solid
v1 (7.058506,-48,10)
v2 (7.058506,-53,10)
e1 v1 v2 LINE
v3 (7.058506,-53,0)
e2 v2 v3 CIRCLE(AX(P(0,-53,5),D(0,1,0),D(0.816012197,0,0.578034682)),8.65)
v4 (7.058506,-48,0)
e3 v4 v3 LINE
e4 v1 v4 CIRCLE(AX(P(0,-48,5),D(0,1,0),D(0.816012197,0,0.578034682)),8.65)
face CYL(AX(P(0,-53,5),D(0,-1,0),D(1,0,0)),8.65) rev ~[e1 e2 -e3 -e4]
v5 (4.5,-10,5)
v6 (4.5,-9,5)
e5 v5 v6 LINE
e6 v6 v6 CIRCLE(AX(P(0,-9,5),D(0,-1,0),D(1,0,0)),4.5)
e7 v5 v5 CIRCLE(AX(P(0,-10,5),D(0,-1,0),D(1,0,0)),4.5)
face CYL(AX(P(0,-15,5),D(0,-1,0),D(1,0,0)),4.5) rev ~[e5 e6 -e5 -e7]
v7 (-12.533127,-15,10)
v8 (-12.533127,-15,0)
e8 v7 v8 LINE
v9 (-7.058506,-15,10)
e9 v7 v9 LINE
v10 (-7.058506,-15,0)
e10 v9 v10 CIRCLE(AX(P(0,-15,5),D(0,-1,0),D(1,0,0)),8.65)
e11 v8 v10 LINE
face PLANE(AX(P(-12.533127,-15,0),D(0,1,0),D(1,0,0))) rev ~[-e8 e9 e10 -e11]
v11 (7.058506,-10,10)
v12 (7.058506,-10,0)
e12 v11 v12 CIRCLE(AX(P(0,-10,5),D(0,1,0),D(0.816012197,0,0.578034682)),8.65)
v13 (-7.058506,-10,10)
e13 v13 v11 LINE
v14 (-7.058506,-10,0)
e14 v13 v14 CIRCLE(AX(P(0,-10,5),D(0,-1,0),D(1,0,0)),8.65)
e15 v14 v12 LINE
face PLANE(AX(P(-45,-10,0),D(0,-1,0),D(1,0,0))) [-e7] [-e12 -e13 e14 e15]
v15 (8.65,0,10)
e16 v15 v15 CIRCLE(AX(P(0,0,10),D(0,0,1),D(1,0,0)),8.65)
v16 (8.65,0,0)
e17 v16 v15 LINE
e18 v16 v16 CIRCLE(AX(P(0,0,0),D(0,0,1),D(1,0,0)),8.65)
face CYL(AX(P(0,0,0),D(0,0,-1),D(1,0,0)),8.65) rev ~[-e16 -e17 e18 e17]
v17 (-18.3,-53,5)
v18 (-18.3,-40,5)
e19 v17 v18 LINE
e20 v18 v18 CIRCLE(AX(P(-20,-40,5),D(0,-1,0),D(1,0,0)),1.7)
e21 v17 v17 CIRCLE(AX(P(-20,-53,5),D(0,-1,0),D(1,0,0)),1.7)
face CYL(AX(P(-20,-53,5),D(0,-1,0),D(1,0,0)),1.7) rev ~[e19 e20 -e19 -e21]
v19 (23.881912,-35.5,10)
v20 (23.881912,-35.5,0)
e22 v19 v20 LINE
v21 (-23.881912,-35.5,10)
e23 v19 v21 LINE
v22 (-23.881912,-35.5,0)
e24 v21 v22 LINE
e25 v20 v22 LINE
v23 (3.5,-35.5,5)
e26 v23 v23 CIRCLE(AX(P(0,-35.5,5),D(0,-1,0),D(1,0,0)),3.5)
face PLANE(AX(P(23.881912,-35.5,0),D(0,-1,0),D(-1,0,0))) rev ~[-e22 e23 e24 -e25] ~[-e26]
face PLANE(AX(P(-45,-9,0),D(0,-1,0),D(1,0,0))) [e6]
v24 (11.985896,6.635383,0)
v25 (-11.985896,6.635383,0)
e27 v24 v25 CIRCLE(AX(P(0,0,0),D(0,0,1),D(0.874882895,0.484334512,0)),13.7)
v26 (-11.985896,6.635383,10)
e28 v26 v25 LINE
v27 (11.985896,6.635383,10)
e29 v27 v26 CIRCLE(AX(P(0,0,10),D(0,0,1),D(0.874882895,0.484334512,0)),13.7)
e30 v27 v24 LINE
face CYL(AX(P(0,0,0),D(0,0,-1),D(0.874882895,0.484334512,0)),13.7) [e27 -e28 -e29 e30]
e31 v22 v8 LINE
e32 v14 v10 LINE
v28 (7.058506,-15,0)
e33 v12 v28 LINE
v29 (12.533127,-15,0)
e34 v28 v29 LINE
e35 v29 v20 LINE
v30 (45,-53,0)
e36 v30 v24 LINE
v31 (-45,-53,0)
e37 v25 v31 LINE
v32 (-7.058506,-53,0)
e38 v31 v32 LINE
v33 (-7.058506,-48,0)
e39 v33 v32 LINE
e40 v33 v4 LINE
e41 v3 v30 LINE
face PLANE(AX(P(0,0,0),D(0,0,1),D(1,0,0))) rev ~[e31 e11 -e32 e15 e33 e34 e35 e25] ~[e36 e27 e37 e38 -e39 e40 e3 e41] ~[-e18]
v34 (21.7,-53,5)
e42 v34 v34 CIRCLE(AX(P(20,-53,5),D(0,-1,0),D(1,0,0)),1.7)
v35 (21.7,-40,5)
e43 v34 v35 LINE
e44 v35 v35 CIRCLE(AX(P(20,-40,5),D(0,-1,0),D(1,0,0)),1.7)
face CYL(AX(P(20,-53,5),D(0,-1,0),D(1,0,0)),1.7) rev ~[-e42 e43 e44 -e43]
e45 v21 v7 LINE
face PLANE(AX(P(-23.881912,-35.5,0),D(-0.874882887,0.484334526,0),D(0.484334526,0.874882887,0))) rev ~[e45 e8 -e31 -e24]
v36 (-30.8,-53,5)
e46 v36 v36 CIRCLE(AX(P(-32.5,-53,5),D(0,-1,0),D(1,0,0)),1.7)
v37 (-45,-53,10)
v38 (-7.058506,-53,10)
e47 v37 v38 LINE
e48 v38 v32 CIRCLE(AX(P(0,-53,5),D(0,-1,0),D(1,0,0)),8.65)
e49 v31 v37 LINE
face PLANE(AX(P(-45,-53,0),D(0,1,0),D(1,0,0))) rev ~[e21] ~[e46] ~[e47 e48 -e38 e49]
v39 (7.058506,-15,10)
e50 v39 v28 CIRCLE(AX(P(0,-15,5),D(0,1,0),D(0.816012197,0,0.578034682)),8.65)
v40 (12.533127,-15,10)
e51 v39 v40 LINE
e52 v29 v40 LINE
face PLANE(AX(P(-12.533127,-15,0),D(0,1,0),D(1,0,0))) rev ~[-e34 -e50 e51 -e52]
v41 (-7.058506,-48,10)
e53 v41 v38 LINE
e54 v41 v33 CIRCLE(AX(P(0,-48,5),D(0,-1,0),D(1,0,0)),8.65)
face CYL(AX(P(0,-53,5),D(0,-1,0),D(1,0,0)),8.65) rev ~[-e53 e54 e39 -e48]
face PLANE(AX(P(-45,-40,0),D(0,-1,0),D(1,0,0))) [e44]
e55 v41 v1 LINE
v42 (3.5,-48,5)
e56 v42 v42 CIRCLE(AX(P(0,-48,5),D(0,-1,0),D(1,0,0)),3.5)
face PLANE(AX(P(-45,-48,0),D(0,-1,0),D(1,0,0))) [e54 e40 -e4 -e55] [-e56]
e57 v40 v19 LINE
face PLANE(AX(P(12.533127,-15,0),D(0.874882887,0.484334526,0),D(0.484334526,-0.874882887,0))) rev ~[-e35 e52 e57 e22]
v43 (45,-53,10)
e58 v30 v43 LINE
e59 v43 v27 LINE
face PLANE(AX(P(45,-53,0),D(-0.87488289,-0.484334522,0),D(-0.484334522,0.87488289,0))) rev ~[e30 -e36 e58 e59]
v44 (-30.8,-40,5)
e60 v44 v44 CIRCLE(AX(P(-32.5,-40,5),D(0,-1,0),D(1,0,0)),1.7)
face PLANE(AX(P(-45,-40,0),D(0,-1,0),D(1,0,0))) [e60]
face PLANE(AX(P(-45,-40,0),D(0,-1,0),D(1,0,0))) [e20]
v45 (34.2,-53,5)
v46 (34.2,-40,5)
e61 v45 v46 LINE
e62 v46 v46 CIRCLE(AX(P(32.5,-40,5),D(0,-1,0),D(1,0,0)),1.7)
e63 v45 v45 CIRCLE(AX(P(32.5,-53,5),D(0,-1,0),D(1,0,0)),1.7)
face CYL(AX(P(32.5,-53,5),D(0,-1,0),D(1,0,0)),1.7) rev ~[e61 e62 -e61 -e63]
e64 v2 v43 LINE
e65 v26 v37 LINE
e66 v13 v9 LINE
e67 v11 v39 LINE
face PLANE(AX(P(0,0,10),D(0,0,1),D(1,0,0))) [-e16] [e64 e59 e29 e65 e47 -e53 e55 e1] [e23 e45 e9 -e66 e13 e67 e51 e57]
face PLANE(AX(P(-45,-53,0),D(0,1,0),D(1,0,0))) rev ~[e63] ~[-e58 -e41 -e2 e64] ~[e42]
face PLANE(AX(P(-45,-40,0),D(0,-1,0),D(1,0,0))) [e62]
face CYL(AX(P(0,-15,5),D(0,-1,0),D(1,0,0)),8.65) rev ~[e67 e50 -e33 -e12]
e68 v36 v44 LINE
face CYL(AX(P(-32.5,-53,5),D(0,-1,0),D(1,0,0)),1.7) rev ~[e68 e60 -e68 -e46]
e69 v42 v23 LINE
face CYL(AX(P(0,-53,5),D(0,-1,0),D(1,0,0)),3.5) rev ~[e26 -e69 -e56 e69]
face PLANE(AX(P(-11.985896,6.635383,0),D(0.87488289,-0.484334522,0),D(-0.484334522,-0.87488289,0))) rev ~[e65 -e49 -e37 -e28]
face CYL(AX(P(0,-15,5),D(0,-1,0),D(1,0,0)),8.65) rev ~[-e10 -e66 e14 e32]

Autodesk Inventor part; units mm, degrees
ref_plane "YZ Plane" through (0, 0, 0) normal (1, 0, 0) x (0, 1, 0)
ref_plane "XZ Plane" through (0, 0, 0) normal (0, 1, 0) x (-1, 0, 0)
ref_plane "XY Plane" through (0, 0, 0) normal (0, 0, 1) x (1, 0, 0)
sketch "Sketch1" plane through (0, 0, 0) normal (0, 0, 1) x (1, 0, 0)
  circle A0 centre (0, 0) radius 8.7
  arc A1 (11.985896, 6.635383) -> (-11.985896, 6.635383) centre (0, 0) ccw
  line L0 (0, 52.910691) -> (0, -52.910691) construction
  line L1 (-45, -53) -> (45, -53)
  line L2 (-45, -53) -> (-11.985896, 6.635383)
  line L3 (45, -53) -> (11.985896, 6.635383)
  line L4 (12.533127, -15) -> (23.881912, -35.5)
  line L5 (23.881912, -35.5) -> (-23.881912, -35.5)
  line L6 (-12.533127, -15) -> (12.533127, -15)
  line L7 (-23.881912, -35.5) -> (-12.533127, -15)
  circle A2 centre (0, 0) radius 8.65
  dimension "d0" = 5
  dimension "d1" = 53
  dimension "d2" = 90
  dimension "d3" = 45
  dimension "d12" = 17.5
  dimension "d13" = 15
  dimension "d15" = 10
  dimension "d16" = 10
  dimension "d41" = 17.3
sketch "Sketch1 outline for Extrusion1" plane through (0, 0, 0) normal (0, 0, 1) x (1, 0, 0)
  line L0 (-45, -53) -> (45, -53)
  line L1 (45, -53) -> (11.985896, 6.635383)
  arc A0 (11.985896, 6.635383) -> (-11.985896, 6.635383) centre (0, 0) ccw
  line L2 (-11.985896, 6.635383) -> (-45, -53)
  line L3 (12.533127, -15) -> (23.881912, -35.5)
  line L4 (23.881912, -35.5) -> (-23.881912, -35.5)
  line L5 (-23.881912, -35.5) -> (-12.533127, -15)
  line L6 (-12.533127, -15) -> (12.533127, -15)
  circle A1 centre (0, 0) radius 8.65
extrude "Extrusion1" add sketch "Sketch1 outline for Extrusion1" along normal blind 5
sketch "Sketch2" plane through (0, 0, 5) normal (0, 0, 1) x (1, 0, 0)
  line L0 (45, -53) -> (11.985896, 6.635383)
  arc A0 (11.985896, 6.635383) -> (-11.985896, 6.635383) centre (0, 0) ccw
  line L1 (-11.985896, 6.635383) -> (-45, -53)
  line L2 (-45, -53) -> (45, -53)
  line L3 (12.533127, -15) -> (23.881912, -35.5)
  line L4 (23.881912, -35.5) -> (-23.881912, -35.5)
  line L5 (-23.881912, -35.5) -> (-12.533127, -15)
  line L6 (-12.533127, -15) -> (12.533127, -15)
  line L7 (39.910172, -50) -> (9.361247, 5.182379)
  arc A1 (9.361247, 5.182379) -> (-9.361247, 5.182379) centre (0, 0) ccw
  line L8 (-9.361247, 5.182379) -> (-39.910172, -50)
  line L9 (-39.910172, -50) -> (39.910172, -50)
  line L10 (-14.301359, -12) -> (-28.97174, -38.5)
  line L11 (-28.97174, -38.5) -> (28.97174, -38.5)
  line L12 (28.97174, -38.5) -> (14.301359, -12)
  line L13 (14.301359, -12) -> (-14.301359, -12)
  circle A2 centre (0, 0) radius 8.65
  point P0 (0, 0)
  point P1 (-11.653536, 1.041678)
  point P2 (11.653536, 1.041678)
  dimension "d19" = 3
  dimension "d20" = 3
  dimension "d42" = 17.3
extrude "Extrusion2" add sketch "Sketch2" along normal blind 5 contours L2 L1 A0 L0 | L9 L8 A1 L7 | L13 L12 L11 L10
sketch "Sketch3" plane through (-45, -53, 0) normal (0, -1, 0) x (1, 0, 0)
  line L0 (45, 0) -> (45, 10) construction
  line L1 (32.466873, 10) -> (57.533127, 10) construction
  line L2 (0, 0) -> (0, 10) construction
  line L3 (0, 5) -> (90, 5) construction
  line L4 (90, 0) -> (90, 10) construction
  line L5 (33.3, 5) -> (56.7, 5) construction
  circle A0 centre (45, 5) radius 8.65
  circle A1 centre (45, 5) radius 3.5
  circle A2 centre (45, 5) radius 4.5
  circle A3 centre (77.5, 5) radius 1.7
  circle A4 centre (65, 5) radius 1.7
  circle A5 centre (12.5, 5) radius 1.7
  circle A6 centre (25, 5) radius 1.7
  point P0 (56.653536, 5)
  point P1 (33.346464, 5)
  dimension "d24" = 17.3
  dimension "d25" = 7
  dimension "d32" = 9
  dimension "d35" = 3.4
  dimension "d36" = 12.5
  dimension "d37" = 3.4
  dimension "d38" = 12.5
extrude "Extrusion3" cut sketch "Sketch3" against normal blind 5 contours A0 | A2
extrude "Extrusion4" cut sketch "Sketch3" against normal blind 43 contours A1
extrude "Extrusion5" cut sketch "Sketch3" against normal up to surface (5 mm away) from surface at -38 contours A0 | A2
extrude "Extrusion6" cut sketch "Sketch3" against normal blind 6 from surface at -38 contours A1 | A2
extrude "Extrusion7" cut sketch "Sketch3" against normal blind 13 contours A3 | A4 | A5 | A6
properties part number "96mmWheelBracket_3DPrint"
